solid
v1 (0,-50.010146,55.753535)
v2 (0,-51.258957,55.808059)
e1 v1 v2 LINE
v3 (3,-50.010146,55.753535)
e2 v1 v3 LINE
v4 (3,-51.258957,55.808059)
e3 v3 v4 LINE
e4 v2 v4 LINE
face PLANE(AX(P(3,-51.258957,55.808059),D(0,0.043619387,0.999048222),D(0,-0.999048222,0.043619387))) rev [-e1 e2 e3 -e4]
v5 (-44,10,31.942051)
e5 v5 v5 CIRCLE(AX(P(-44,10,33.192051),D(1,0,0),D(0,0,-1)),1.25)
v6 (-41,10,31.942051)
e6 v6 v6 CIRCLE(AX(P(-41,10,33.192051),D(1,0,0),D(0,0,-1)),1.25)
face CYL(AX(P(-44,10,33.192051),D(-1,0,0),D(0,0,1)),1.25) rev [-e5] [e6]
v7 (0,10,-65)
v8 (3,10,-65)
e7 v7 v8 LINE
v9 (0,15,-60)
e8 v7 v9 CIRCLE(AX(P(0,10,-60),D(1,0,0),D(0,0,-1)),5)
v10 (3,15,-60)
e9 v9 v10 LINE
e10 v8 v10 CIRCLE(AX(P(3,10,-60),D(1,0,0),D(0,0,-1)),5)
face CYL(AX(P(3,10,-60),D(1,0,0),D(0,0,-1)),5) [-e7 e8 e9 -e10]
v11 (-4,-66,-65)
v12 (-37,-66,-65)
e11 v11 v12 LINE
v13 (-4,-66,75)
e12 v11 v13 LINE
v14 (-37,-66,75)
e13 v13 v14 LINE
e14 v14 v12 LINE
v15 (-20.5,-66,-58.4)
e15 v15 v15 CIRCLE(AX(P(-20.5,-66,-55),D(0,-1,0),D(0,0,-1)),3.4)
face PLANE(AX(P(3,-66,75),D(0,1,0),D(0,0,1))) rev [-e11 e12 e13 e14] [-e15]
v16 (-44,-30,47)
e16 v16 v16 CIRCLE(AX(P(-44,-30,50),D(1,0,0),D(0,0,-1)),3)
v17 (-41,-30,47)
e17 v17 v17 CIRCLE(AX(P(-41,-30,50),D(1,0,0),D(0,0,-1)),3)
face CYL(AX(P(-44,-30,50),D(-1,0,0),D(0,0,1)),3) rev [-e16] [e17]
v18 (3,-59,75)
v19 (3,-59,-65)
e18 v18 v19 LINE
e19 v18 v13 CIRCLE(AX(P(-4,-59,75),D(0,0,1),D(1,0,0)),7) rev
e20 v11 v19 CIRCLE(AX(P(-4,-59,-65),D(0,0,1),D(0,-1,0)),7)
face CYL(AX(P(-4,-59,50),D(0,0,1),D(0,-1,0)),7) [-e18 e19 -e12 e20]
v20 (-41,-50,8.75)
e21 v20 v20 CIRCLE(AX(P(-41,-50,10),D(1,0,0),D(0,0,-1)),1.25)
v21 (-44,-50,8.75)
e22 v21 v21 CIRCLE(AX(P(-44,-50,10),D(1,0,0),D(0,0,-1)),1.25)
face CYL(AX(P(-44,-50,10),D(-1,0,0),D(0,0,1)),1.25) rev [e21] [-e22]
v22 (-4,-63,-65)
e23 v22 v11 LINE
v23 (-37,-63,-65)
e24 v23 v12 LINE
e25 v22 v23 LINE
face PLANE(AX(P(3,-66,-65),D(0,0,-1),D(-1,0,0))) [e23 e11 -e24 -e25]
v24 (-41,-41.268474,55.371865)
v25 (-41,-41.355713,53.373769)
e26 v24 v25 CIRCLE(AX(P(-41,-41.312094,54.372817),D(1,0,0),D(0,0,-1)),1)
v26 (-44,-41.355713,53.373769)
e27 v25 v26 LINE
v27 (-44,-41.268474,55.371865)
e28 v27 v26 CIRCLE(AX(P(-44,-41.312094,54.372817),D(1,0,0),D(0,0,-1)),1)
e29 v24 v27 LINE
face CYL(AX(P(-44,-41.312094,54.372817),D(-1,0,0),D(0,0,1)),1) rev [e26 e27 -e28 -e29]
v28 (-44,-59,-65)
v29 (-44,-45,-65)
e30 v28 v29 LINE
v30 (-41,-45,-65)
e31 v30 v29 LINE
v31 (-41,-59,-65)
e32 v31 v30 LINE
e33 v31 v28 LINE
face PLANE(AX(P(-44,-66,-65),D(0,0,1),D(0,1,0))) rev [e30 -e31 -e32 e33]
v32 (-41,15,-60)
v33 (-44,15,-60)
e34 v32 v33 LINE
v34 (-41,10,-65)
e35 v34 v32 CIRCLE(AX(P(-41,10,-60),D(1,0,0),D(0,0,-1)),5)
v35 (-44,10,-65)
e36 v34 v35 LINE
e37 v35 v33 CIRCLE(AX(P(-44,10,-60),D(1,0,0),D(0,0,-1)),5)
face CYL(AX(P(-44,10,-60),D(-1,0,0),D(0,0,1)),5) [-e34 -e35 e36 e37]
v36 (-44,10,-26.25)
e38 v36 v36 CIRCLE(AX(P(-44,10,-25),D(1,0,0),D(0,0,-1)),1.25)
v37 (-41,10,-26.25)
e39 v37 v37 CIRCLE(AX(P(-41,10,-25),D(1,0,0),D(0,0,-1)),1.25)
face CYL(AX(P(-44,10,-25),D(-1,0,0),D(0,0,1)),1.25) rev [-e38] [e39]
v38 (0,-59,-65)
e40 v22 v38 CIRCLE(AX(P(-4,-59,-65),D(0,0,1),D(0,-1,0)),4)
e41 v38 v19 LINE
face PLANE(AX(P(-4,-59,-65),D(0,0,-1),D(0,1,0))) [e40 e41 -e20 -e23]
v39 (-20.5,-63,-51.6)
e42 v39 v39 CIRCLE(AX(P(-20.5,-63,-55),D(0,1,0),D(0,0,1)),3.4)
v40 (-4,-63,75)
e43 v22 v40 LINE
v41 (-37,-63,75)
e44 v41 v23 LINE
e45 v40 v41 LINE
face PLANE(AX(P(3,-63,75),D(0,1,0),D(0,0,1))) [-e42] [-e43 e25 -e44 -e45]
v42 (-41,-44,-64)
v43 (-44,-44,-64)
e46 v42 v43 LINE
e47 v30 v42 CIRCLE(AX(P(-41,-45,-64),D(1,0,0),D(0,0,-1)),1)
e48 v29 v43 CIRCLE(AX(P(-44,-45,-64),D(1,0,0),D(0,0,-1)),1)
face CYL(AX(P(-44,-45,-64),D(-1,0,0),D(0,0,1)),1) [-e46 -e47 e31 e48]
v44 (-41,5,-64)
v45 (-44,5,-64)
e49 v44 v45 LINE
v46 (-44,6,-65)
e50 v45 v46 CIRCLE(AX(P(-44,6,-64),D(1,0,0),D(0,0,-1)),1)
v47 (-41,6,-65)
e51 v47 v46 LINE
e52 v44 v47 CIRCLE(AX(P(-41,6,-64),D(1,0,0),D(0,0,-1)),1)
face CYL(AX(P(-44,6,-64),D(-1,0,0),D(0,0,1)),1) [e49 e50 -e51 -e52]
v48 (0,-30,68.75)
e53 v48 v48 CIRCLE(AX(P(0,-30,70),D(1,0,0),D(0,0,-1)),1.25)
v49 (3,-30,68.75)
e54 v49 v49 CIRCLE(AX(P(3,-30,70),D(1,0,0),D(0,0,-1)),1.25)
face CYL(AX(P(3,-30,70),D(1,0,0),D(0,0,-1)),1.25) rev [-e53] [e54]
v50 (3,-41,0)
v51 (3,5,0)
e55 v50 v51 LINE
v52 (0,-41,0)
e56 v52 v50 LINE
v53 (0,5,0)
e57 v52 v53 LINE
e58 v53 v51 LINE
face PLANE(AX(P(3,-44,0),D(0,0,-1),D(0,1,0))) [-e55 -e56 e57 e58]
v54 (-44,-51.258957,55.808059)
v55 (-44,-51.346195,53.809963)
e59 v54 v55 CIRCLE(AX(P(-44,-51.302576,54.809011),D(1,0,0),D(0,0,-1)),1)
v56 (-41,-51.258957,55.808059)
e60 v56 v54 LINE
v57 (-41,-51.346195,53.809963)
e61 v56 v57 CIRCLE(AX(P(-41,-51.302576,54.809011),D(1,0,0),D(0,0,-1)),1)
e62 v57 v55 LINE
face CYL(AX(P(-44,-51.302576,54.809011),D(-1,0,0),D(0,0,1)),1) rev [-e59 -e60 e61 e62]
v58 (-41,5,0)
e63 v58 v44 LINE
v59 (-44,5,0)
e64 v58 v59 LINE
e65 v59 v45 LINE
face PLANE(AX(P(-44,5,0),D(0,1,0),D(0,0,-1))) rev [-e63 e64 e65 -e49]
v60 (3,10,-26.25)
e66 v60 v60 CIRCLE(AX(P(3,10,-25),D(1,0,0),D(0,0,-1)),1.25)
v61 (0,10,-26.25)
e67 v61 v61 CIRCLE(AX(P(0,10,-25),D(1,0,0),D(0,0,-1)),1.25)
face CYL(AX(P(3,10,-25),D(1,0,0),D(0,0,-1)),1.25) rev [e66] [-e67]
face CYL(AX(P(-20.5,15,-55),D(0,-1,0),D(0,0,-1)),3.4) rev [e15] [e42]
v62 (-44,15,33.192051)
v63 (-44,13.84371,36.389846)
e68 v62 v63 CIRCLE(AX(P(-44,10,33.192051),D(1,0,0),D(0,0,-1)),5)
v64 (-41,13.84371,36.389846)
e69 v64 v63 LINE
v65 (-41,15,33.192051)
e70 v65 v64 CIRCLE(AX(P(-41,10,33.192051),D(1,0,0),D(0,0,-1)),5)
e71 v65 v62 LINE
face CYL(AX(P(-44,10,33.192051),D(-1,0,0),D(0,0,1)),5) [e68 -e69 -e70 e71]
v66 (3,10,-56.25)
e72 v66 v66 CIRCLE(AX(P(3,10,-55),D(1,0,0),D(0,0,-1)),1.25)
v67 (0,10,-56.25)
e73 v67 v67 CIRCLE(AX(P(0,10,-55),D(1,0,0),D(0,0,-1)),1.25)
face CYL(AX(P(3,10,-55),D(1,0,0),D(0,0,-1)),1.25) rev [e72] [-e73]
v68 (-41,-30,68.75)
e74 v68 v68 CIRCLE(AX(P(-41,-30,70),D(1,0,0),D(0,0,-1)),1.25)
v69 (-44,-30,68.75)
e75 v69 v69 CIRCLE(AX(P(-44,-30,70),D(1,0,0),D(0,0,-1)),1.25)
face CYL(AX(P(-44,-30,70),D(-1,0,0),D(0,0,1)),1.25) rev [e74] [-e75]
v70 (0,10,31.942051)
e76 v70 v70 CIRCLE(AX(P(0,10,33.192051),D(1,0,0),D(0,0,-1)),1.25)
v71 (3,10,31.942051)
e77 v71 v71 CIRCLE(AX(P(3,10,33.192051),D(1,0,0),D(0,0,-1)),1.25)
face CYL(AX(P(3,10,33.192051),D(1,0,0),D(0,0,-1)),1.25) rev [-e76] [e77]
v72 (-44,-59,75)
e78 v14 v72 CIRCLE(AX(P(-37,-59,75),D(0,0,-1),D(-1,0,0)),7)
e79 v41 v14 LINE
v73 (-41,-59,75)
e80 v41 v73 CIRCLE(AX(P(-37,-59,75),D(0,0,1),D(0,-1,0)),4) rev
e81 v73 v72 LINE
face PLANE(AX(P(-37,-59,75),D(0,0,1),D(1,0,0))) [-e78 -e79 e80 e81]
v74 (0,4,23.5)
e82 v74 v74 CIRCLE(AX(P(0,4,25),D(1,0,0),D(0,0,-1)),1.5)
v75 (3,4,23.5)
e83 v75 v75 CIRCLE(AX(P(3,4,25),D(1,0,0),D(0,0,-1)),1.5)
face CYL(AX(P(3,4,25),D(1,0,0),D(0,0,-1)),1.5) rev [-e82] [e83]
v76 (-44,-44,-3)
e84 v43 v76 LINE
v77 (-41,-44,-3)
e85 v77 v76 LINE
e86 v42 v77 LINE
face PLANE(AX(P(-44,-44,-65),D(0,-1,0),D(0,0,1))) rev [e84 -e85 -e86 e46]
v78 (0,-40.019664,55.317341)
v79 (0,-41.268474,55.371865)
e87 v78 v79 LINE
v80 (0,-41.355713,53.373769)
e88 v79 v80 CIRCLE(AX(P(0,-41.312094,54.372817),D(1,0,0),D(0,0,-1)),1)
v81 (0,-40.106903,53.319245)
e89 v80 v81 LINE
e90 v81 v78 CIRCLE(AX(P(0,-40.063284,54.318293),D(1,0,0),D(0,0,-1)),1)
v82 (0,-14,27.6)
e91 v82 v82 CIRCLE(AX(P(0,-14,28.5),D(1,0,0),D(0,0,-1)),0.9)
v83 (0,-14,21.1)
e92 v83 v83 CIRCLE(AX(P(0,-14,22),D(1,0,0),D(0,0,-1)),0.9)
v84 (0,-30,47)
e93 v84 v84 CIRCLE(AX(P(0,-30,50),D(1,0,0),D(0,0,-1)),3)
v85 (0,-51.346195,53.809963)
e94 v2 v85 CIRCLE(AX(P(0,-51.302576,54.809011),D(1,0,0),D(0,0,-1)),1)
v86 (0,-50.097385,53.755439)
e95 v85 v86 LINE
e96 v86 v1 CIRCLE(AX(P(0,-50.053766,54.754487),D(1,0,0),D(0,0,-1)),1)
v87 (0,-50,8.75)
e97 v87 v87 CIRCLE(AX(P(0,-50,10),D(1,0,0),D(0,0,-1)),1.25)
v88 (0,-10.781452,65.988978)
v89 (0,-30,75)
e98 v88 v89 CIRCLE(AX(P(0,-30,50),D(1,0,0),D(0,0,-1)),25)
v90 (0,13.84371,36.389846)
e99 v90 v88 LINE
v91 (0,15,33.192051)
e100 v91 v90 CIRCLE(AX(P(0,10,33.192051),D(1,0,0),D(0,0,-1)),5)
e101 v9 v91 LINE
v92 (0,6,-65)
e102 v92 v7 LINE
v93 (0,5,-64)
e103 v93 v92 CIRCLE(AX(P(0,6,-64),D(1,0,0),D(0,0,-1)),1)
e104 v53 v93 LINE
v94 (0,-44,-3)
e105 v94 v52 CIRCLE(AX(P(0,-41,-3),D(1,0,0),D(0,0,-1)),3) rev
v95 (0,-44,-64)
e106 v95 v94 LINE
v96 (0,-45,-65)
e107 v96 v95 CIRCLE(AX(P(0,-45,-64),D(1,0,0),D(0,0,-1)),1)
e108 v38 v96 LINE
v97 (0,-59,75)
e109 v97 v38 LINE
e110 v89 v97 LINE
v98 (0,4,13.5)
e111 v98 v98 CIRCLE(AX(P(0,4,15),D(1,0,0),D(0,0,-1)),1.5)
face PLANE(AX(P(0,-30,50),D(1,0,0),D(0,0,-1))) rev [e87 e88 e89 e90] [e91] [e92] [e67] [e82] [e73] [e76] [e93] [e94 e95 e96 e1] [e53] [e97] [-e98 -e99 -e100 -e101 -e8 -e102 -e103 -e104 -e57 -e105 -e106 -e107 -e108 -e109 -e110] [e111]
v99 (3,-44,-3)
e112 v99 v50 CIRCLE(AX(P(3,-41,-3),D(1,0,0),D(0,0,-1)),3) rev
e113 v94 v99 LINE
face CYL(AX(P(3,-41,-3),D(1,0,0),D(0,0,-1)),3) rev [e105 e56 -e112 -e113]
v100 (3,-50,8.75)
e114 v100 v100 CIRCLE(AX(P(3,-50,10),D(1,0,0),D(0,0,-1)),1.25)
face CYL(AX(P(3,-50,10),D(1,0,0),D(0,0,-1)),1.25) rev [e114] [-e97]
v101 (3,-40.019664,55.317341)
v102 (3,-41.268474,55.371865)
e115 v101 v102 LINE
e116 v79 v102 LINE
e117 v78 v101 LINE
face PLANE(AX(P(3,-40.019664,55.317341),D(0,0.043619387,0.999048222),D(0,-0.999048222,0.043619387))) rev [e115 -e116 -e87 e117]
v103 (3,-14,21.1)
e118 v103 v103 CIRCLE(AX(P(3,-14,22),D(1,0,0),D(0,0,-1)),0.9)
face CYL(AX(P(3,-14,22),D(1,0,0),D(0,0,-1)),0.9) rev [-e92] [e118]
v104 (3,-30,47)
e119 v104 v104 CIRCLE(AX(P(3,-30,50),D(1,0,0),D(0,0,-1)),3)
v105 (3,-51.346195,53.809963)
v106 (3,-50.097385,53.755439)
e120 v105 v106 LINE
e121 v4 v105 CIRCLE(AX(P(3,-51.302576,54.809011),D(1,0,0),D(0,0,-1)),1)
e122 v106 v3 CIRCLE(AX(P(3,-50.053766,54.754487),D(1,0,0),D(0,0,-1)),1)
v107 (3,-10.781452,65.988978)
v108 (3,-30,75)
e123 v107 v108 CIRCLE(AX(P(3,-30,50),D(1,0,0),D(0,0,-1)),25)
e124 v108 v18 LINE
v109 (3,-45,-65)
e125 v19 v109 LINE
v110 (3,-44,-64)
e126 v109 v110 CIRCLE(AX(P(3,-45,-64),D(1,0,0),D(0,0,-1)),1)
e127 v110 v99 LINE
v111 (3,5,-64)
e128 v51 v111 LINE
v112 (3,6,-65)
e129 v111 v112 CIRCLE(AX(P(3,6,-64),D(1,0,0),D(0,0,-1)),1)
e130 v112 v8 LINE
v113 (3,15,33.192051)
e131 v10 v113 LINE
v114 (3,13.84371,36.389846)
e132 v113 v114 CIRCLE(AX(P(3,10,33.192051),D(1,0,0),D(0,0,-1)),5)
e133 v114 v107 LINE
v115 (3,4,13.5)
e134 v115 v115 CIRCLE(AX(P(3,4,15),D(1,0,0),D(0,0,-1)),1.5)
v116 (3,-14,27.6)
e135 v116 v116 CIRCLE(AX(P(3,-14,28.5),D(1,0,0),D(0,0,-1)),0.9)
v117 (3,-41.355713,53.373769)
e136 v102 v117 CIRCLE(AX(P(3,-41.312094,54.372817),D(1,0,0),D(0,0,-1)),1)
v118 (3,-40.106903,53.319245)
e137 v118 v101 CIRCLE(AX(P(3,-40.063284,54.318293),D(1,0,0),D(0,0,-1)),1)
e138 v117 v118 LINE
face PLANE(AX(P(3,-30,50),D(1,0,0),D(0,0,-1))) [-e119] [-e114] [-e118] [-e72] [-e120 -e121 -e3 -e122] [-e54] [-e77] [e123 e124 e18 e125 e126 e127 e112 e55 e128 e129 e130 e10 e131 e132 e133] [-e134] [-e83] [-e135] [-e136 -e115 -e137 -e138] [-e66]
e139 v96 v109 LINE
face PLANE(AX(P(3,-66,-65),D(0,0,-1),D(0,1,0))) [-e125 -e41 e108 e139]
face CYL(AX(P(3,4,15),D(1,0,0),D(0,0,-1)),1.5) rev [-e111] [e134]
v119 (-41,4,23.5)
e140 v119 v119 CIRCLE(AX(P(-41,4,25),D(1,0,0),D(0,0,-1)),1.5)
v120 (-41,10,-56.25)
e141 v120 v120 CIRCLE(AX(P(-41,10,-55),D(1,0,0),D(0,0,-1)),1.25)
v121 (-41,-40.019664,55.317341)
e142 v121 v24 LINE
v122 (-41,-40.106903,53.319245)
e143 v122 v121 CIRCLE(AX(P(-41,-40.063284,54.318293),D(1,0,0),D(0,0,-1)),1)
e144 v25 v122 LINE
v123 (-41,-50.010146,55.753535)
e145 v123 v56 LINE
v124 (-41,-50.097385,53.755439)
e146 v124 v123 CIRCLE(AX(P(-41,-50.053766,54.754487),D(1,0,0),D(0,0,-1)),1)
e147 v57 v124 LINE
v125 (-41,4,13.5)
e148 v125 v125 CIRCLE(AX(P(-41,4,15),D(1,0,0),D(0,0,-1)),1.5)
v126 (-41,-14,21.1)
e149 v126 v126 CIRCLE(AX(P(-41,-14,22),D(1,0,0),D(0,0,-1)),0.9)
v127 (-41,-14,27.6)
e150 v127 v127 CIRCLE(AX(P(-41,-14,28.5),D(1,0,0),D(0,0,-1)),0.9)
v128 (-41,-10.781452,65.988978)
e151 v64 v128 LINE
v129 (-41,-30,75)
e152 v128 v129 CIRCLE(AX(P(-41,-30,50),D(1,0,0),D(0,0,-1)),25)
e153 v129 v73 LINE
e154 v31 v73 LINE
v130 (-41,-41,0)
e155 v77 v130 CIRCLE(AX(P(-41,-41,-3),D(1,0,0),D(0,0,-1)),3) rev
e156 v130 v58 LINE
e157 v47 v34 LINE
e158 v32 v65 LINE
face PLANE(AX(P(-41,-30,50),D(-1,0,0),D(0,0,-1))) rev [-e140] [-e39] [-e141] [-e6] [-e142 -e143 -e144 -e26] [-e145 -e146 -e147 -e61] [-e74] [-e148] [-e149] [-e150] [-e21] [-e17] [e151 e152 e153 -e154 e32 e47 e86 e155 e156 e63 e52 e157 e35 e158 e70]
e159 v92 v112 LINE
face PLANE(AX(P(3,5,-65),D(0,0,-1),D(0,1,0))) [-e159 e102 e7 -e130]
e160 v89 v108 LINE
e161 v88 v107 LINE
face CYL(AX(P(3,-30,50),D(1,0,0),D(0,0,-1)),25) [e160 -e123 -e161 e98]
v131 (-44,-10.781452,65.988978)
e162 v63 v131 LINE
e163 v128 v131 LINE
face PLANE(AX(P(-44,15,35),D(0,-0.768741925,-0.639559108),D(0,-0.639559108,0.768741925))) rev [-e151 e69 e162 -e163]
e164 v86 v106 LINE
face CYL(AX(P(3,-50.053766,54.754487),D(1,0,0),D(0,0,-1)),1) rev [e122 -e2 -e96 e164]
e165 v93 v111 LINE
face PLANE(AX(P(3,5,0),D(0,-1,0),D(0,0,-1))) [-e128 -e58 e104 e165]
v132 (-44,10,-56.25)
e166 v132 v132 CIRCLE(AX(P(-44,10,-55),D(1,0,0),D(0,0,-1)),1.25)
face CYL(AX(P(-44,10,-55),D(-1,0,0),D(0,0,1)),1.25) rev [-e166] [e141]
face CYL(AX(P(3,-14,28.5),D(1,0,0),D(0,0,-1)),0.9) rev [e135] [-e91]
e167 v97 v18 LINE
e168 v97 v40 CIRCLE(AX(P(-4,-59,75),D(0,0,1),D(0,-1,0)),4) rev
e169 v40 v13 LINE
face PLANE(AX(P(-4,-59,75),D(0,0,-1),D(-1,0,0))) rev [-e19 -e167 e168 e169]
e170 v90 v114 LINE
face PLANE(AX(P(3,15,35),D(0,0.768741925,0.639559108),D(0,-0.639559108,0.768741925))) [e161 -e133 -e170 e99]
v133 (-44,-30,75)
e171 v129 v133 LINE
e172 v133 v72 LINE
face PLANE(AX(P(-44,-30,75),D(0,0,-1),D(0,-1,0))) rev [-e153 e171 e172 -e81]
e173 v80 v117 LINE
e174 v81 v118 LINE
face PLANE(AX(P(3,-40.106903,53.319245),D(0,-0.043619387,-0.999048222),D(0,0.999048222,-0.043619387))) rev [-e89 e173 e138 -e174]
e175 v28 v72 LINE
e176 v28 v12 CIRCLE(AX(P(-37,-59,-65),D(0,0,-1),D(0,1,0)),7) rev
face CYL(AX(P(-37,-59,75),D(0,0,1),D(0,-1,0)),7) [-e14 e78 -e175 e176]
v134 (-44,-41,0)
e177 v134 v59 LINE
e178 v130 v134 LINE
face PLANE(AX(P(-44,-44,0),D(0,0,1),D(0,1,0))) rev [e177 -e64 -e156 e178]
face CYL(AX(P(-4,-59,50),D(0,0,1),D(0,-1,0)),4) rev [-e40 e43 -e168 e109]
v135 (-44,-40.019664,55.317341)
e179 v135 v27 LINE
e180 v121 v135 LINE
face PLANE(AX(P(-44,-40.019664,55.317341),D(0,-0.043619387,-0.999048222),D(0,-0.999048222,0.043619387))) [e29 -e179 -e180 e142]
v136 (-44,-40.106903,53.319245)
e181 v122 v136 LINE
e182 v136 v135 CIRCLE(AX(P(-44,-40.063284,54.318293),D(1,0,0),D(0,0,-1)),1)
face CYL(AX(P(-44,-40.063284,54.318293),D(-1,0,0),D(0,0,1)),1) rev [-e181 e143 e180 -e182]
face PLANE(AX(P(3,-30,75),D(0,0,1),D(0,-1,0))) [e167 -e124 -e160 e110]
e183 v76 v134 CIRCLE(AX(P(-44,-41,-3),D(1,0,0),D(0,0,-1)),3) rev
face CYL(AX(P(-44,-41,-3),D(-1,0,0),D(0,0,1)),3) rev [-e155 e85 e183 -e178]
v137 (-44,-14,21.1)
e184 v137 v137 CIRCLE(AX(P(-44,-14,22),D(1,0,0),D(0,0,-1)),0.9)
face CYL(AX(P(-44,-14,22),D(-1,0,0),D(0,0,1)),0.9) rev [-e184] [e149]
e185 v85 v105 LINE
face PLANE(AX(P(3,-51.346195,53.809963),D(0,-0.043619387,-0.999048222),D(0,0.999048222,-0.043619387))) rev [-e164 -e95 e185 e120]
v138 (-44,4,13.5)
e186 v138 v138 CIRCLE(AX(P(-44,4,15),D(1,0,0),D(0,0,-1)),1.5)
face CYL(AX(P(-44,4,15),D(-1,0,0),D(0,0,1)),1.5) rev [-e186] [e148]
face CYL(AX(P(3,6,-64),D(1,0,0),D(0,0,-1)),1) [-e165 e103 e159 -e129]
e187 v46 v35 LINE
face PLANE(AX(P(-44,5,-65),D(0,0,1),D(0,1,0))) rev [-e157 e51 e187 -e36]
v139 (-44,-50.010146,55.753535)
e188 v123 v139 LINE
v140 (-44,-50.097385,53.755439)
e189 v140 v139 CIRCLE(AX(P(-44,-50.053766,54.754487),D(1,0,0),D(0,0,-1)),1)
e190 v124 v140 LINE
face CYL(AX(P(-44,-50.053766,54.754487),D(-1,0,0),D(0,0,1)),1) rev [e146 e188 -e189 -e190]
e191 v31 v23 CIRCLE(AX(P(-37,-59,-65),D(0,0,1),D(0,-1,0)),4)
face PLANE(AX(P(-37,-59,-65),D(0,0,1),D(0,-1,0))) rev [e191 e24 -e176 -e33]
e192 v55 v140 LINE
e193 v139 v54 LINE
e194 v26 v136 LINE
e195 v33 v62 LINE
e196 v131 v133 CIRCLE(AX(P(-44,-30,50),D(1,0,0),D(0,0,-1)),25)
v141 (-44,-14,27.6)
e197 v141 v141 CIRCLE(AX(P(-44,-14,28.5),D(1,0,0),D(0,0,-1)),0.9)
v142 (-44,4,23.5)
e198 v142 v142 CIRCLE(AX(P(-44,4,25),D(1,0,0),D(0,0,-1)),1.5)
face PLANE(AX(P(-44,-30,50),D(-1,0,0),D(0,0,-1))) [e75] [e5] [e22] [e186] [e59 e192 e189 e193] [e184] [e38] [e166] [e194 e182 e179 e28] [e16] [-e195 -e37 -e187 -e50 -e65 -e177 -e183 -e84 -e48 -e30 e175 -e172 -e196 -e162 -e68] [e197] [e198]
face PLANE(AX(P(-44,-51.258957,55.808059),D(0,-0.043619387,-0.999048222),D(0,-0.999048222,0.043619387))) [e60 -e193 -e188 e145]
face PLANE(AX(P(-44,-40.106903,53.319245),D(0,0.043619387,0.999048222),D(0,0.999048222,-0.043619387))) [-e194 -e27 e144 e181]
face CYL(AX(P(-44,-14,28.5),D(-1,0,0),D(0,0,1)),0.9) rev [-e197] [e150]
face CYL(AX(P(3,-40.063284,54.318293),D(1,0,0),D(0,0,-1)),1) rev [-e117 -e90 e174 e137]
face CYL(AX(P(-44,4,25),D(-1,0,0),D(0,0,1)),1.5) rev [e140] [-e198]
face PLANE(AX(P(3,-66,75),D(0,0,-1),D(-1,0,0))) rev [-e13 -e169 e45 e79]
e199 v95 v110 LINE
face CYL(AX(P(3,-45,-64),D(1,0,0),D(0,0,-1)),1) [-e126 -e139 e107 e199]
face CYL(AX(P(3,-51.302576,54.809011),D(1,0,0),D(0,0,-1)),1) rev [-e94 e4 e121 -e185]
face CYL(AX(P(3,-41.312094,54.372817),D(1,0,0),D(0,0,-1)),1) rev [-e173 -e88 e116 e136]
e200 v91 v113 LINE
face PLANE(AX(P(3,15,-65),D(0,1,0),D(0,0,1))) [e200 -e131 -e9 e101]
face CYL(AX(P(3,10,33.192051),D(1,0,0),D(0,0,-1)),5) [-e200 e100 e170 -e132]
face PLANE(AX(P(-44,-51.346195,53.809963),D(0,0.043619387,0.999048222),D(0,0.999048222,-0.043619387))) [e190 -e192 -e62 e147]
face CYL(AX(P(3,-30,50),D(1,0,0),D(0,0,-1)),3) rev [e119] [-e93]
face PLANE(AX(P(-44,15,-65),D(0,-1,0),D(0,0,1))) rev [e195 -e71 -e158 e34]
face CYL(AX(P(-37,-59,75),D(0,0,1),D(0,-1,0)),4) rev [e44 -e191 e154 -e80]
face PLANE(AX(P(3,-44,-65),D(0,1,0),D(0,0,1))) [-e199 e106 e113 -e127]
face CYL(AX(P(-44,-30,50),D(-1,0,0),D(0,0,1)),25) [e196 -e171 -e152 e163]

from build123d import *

# Parameters (mm, degrees)
SKETCH1_R              = 3
SKETCH1_R_2            = 1.25
SKETCH1_R_3            = 1.5
SKETCH1_R_4            = 0.9
BOSS_EXTRUDE1_DEPTH    = 3
FILLET1_R              = 5
FILLET2_R              = 1
CUT_EXTRUDE1_DEPTH     = 100.949987494
SKETCH4_W              = 140
SKETCH4_H              = 3
BOSS_EXTRUDE2_DEPTH    = 20.5
FILLET4_R              = 3
CONVERT_SOLID1_START   = -65
CONVERT_SOLID1_DEPTH   = 140
CONVERT_SOLID1_2_DEPTH = 140
SKETCH9_R              = 3.4
CUT_EXTRUDE3_DEPTH     = 119.836021475


# Read off the part's stored shape, not the designer's step: Convert-Solid1
with BuildPart() as part:
    # Sketch1 → Boss-Extrude1 (new body)
    with BuildSketch(Plane(origin=(0, 0, 0), x_dir=(0, 0, -1), z_dir=(1, 0, 0))):
        with BuildLine():
            Line((0, 5), (65, 5))
            Line((65, 5), (65, 15))
            Line((65, 15), (-35, 15))
            Line((-35, 15), (-65.988977704, -10.781451876))
            ThreePointArc((-65.988977704, -10.781451876), (-72.635419618, -19.386905319), (-75, -30))
            Line((-75, -30), (-75, -66))
            Line((-75, -66), (65, -66))
            Line((65, -66), (65, -44))
            Line((65, -44), (0, -44))
            Line((0, -44), (0, 5))
        make_face()
        with Locations((-50, -30)):
            Circle(SKETCH1_R, mode=Mode.SUBTRACT)
        with Locations((55, 10)):
            Circle(SKETCH1_R_2, mode=Mode.SUBTRACT)
        with Locations((25, 10)):
            Circle(SKETCH1_R_2, mode=Mode.SUBTRACT)
        with Locations((-33.192050804, 10)):
            Circle(SKETCH1_R_2, mode=Mode.SUBTRACT)
        with Locations((-70, -30)):
            Circle(SKETCH1_R_2, mode=Mode.SUBTRACT)
        with Locations((-10, -50)):
            Circle(SKETCH1_R_2, mode=Mode.SUBTRACT)
        with Locations((-25, 4)):
            Circle(SKETCH1_R_3, mode=Mode.SUBTRACT)
        with Locations((-15, 4)):
            Circle(SKETCH1_R_3, mode=Mode.SUBTRACT)
        with Locations((-22, -14)):
            Circle(SKETCH1_R_4, mode=Mode.SUBTRACT)
        with Locations((-28.5, -14)):
            Circle(SKETCH1_R_4, mode=Mode.SUBTRACT)
    extrude(amount=BOSS_EXTRUDE1_DEPTH)

    # Fillet1
    fillet1_edges = [part.edges().sort_by_distance(p)[0] for p in [
        (1.5, 15, 35),
        (1.5, 15, -65),
    ]]
    fillet(fillet1_edges, radius=FILLET1_R)

    # Fillet2
    fillet2_edges = [part.edges().sort_by_distance(p)[0] for p in [
        (1.5, 5, -65),
        (1.5, -44, -65),
    ]]
    fillet(fillet2_edges, radius=FILLET2_R)

    # Sketch2 → Cut-Extrude1 (cut, through all)
    with BuildSketch(Plane(origin=(3, 0, 0), x_dir=(0, 0, -1), z_dir=(1, 0, 0))):
        with BuildLine():
            Line((-53.319244679, -40.106902918), (-53.373768913, -41.355713195))
            ThreePointArc((-53.373768913, -41.355713195), (-54.416436522, -42.31114203), (-55.371865356, -41.268474421))
            Line((-55.371865356, -41.268474421), (-55.317341122, -40.019664144))
            ThreePointArc((-55.317341122, -40.019664144), (-54.274673513, -39.06423531), (-53.319244679, -40.106902918))
        make_face()
        with BuildLine():
            Line((-55.80805923, -51.258956637), (-55.753534996, -50.01014636))
            ThreePointArc((-55.753534996, -50.01014636), (-54.710867387, -49.054717525), (-53.755438553, -50.097385134))
            Line((-53.755438553, -50.097385134), (-53.809962787, -51.346195411))
            ThreePointArc((-53.809962787, -51.346195411), (-54.852630396, -52.301624245), (-55.80805923, -51.258956637))
        make_face()
    extrude(amount=-CUT_EXTRUDE1_DEPTH, mode=Mode.SUBTRACT)

    # Sketch4 → Boss-Extrude2 (add)
    with BuildSketch(Plane.ZY):
        with Locations((5, -64.5)):
            Rectangle(SKETCH4_W, SKETCH4_H)
    extrude(amount=BOSS_EXTRUDE2_DEPTH)

    # Fillet4
    fillet4_edges = [part.edges().sort_by_distance(p)[0] for p in [
        (1.5, -44, 0),
    ]]
    fillet(fillet4_edges, radius=FILLET4_R)

    # Mirror1: part across plane


with BuildPart() as part_1:
    add(part.part)
    add(part.part.mirror(Plane(origin=(-20.5, 0, 0), x_dir=(0, 0, 1), z_dir=(1, 0, 0))))

    # Convert-Solid1 outline → Convert-Solid1 (cut)
    with BuildSketch(Plane.XY.offset(CONVERT_SOLID1_START)):
        with BuildLine():
            ThreePointArc((3, -59), (0.949747468, -63.949747468), (-4, -66))
            Line((-4, -66), (3, -66))
            Line((3, -66), (3, -59))
        make_face()
        with BuildLine():
            Line((-44, -66), (-37, -66))
            ThreePointArc((-37, -66), (-41.949747468, -63.949747468), (-44, -59))
            Line((-44, -59), (-44, -66))
        make_face()
    extrude(amount=CONVERT_SOLID1_DEPTH, mode=Mode.SUBTRACT)

    # Convert-Solid1 2 outline → Convert-Solid1 2 (add)
    with BuildSketch(Plane.XY.offset(CONVERT_SOLID1_START)):
        with BuildLine():
            Line((-41, -63), (-37, -63))
            ThreePointArc((-37, -63), (-39.828427125, -61.828427125), (-41, -59))
            Line((-41, -59), (-41, -63))
        make_face()
        with BuildLine():
            ThreePointArc((0, -59), (-1.171572875, -61.828427125), (-4, -63))
            Line((-4, -63), (0, -63))
            Line((0, -63), (0, -59))
        make_face()
    extrude(amount=CONVERT_SOLID1_2_DEPTH)

    # Sketch9 → Cut-Extrude3 (cut, through all)
    with BuildSketch(Plane.XZ.offset(66)):
        with Locations(Location((-20.5, -55, 0), (0, 0, 270))):
            Circle(SKETCH9_R)
    extrude(amount=-CUT_EXTRUDE3_DEPTH, mode=Mode.SUBTRACT)


solid = part_1.part
